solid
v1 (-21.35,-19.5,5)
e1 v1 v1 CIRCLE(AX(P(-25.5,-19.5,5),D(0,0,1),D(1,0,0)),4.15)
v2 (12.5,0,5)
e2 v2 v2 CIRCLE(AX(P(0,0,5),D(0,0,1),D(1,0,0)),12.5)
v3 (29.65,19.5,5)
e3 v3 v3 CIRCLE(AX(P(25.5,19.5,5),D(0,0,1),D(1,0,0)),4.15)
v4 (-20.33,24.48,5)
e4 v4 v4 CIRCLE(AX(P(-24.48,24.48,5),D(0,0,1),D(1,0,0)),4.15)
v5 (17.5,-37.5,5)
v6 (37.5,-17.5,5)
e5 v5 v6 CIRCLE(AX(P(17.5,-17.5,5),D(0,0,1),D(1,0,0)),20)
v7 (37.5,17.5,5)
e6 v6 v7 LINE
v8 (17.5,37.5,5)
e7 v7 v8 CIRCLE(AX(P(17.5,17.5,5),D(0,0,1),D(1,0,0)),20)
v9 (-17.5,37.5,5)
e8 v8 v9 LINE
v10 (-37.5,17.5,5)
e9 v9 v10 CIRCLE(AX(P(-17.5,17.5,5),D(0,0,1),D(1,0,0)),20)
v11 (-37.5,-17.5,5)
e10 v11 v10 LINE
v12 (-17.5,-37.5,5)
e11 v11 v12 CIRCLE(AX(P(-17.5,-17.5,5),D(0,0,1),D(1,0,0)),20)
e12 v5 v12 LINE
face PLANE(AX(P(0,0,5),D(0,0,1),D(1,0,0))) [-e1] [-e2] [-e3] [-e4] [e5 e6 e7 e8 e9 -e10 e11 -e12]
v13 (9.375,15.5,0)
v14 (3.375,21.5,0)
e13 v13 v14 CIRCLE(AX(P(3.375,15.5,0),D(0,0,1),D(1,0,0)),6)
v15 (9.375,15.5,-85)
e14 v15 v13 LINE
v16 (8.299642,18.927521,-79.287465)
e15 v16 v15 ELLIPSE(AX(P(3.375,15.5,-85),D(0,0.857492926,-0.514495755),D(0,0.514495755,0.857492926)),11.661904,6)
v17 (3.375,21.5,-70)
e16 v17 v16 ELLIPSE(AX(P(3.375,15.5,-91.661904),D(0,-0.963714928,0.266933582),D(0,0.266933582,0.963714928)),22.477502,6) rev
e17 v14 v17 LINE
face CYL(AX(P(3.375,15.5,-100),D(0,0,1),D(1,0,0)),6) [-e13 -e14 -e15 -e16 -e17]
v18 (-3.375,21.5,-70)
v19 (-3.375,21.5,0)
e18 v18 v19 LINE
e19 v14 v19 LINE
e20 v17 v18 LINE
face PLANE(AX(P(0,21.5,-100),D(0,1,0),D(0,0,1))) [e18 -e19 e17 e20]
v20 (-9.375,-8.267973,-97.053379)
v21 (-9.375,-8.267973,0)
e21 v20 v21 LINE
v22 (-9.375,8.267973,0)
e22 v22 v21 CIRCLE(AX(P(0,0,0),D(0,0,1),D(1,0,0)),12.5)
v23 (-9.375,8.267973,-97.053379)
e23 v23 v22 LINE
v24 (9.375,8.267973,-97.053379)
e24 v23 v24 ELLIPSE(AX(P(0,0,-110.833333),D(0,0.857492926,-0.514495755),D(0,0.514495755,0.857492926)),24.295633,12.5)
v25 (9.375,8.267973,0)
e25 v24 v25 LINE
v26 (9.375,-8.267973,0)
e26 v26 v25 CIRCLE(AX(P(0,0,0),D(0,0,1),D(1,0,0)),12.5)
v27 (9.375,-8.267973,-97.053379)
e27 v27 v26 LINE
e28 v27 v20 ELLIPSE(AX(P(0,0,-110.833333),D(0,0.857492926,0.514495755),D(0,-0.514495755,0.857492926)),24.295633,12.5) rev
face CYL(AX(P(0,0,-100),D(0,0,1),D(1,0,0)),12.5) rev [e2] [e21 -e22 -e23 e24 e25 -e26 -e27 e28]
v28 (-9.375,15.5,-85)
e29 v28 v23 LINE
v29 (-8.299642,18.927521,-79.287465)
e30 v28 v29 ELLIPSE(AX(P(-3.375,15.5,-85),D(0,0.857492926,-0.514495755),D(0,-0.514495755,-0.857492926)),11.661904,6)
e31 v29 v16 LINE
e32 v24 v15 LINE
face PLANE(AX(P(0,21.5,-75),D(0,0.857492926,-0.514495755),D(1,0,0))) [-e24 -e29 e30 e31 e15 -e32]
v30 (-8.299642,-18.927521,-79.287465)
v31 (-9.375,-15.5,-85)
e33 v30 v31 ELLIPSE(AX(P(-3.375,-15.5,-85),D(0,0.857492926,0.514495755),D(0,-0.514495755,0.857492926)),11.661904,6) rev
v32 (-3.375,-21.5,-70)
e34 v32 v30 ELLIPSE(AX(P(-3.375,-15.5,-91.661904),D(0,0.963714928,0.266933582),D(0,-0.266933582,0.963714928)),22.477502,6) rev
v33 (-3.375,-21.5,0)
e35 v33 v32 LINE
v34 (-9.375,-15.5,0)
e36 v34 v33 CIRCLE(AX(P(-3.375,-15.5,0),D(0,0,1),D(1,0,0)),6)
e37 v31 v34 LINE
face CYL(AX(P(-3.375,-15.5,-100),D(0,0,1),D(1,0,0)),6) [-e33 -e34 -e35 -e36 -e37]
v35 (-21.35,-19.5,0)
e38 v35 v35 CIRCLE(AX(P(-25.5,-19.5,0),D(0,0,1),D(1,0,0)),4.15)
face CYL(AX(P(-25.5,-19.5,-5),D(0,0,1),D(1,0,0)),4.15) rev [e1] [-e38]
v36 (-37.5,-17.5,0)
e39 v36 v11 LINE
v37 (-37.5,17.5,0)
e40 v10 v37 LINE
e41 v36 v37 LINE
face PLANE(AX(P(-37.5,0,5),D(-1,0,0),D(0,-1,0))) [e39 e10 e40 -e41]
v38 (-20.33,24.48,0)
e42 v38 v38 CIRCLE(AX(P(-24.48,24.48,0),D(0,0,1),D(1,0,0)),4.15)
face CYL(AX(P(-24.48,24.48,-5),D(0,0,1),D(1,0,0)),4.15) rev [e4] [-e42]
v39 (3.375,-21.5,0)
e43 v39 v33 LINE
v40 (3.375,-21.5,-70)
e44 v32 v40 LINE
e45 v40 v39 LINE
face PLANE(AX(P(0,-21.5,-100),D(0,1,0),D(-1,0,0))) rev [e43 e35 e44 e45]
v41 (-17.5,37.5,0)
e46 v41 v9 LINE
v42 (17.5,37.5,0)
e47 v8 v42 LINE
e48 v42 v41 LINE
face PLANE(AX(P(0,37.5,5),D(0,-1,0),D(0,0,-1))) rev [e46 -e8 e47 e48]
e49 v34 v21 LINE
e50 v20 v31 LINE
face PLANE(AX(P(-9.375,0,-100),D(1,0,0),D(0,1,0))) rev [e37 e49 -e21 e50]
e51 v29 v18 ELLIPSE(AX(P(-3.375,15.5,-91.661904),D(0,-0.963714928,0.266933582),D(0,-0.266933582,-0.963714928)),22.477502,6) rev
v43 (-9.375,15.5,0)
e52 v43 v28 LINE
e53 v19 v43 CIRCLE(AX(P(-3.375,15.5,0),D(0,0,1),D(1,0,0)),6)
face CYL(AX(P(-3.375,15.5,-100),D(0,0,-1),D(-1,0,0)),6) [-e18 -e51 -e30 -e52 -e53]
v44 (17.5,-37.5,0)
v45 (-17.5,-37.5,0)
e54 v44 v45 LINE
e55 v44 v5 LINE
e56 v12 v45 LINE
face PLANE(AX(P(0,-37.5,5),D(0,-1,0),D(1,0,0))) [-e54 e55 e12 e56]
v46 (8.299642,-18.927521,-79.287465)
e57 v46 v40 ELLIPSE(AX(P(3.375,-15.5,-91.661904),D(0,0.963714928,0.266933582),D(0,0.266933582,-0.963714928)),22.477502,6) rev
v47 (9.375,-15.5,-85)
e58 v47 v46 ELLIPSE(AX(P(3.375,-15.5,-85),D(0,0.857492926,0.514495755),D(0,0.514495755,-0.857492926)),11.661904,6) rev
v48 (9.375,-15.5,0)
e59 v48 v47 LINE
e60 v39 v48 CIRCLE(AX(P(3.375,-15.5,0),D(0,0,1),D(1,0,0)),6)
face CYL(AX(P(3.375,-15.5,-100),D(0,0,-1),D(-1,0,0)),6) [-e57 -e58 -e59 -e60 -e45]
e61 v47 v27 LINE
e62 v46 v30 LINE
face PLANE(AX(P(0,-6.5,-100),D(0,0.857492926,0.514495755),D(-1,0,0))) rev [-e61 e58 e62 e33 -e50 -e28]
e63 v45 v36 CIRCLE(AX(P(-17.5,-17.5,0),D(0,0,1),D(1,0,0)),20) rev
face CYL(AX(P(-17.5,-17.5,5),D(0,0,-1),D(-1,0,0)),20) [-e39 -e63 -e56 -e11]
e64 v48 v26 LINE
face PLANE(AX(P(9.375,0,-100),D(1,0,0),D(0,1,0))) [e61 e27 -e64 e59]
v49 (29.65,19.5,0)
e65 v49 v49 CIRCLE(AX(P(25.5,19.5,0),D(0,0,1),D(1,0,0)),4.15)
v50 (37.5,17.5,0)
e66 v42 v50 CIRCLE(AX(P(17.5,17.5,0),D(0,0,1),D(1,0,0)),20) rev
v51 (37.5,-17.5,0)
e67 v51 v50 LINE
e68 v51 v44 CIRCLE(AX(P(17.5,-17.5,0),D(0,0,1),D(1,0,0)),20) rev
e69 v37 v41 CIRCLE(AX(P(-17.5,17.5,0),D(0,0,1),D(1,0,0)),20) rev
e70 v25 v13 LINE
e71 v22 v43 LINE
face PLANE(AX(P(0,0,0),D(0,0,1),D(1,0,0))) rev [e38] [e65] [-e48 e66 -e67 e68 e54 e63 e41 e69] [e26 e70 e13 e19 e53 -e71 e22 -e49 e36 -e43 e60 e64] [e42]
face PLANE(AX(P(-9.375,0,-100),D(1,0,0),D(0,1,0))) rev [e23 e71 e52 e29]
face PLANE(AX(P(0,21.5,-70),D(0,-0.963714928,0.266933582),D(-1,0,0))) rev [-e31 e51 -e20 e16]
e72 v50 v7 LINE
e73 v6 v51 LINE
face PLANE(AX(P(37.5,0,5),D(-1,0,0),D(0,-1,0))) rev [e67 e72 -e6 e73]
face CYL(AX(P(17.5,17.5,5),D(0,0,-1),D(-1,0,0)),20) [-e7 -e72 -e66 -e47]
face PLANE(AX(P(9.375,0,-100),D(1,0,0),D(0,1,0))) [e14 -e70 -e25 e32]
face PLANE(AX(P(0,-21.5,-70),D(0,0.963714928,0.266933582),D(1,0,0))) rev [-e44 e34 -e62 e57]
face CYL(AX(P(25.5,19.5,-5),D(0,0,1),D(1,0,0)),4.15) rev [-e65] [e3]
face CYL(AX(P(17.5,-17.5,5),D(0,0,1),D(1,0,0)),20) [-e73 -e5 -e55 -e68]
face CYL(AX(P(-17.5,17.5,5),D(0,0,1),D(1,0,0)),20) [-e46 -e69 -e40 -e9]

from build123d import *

# Parameters (mm, degrees)
CROQUIS2_W              = 75
CROQUIS2_H              = 75
SALIENTE_EXTRUIR1_DEPTH = 5
SALIENTE_EXTRUIR2_DEPTH = 100
CHAFL_N1_SIZE           = 25
CHAFL_N1_SIZE_2         = 15
CHAFL_N2_SIZE           = 25
CHAFL_N2_SIZE_2         = 15
CORTAR_EXTRUIR1_REACH   = 112.598
CHAFL_N3_SIZE           = 5
REDONDEO1_R             = 6
REDONDEO2_R             = 20
SKETCH1_R               = 4.15
CUT_EXTRUDE2_DEPTH      = 10


with BuildPart() as part:
    # Croquis2 → Saliente-Extruir1 (new body)
    with BuildSketch(Plane(origin=(0, 0, 0), x_dir=(0, 1, 0), z_dir=(0, 0, 1))):
        Rectangle(CROQUIS2_W, CROQUIS2_H)
    extrude(amount=SALIENTE_EXTRUIR1_DEPTH)

    # Croquis2<3> → Saliente-Extruir2 (add)
    with BuildSketch(Plane(origin=(0, 0, 0), x_dir=(0, 1, 0), z_dir=(0, 0, 1))):
        with BuildLine():
            Line((-21.5, 9.375), (-21.5, -9.375))
            Line((-21.5, -9.375), (-8.267972847, -9.375))
            ThreePointArc((-8.267972847, -9.375), (-12.5, 0), (-8.267972847, 9.375))
            Line((-8.267972847, 9.375), (-21.5, 9.375))
        make_face()
        with BuildLine():
            ThreePointArc((8.267972847, 9.375), (12.5, 0), (8.267972847, -9.375))
            Line((8.267972847, -9.375), (21.5, -9.375))
            Line((21.5, -9.375), (21.5, 9.375))
            Line((21.5, 9.375), (8.267972847, 9.375))
        make_face()
    extrude(amount=-SALIENTE_EXTRUIR2_DEPTH)

    # Chaflán1
    # the kernel refuses this chamfer: 25, 15 mm, written as the material it takes off along each edge
    with BuildSketch(Plane(origin=(74.03152743, 21.5, -100), x_dir=(0, 0.01989341895858247, 0.9998021063601227), z_dir=(-1, 0, 0))) as chafl_n1_piece_1:
        Polygon((CHAFL_N1_SIZE * 0.99980210636, -CHAFL_N1_SIZE * 0.0198934189586), (-CHAFL_N1_SIZE_2 * 0.0198934189586, -CHAFL_N1_SIZE_2 * 0.99980210636), (0, 0), align=None)
    extrude(amount=148.06305486, mode=Mode.SUBTRACT)

    # Chaflán2
    # the kernel refuses this chamfer: 25, 15 mm, written as the material it takes off along each edge
    with BuildSketch(Plane(origin=(-74.03152743, -21.5, -100), x_dir=(0, -0.01989341895858247, 0.9998021063601227), z_dir=(1, 0, 0))) as chafl_n2_piece_1:
        Polygon((CHAFL_N2_SIZE * 0.99980210636, -CHAFL_N2_SIZE * 0.0198934189586), (-CHAFL_N2_SIZE_2 * 0.0198934189586, -CHAFL_N2_SIZE_2 * 0.99980210636), (0, 0), align=None)
    extrude(amount=148.06305486, mode=Mode.SUBTRACT)

    # Croquis2<4> → Cortar-Extruir1 (cut, up to next)
    with BuildSketch(Plane(origin=(0, 0, 0), x_dir=(0, 1, 0), z_dir=(0, 0, 1)), mode=Mode.PRIVATE) as cortar_extruir1_sk1:
        with BuildLine():
            ThreePointArc((-8.267972847, 9.375), (-12.5, 0), (-8.267972847, -9.375))
            Line((-8.267972847, -9.375), (8.267972847, -9.375))
            ThreePointArc((8.267972847, -9.375), (11.392972847, -5.142972847), (12.5, 0))
            ThreePointArc((12.5, 0), (11.392972847, 5.142972847), (8.267972847, 9.375))
            Line((8.267972847, 9.375), (-8.267972847, 9.375))
        make_face()
    cortar_extruir1_tool1 = extrude(cortar_extruir1_sk1.sketch, amount=CORTAR_EXTRUIR1_REACH, mode=Mode.PRIVATE) & part.part
    # Croquis2<4> → Cortar-Extruir1 (cut, up to next)
    with BuildSketch(Plane(origin=(0, 0, 0), x_dir=(0, 1, 0), z_dir=(0, 0, 1)), mode=Mode.PRIVATE) as cortar_extruir1_sk2:
        with BuildLine():
            Line((8.267972847, -9.375), (-8.267972847, -9.375))
            ThreePointArc((-8.267972847, -9.375), (0, -12.5), (8.267972847, -9.375))
        make_face()
    cortar_extruir1_tool2 = extrude(cortar_extruir1_sk2.sketch, amount=CORTAR_EXTRUIR1_REACH, mode=Mode.PRIVATE) & part.part
    # Croquis2<4> → Cortar-Extruir1 (cut, up to next)
    with BuildSketch(Plane(origin=(0, 0, 0), x_dir=(0, 1, 0), z_dir=(0, 0, 1)), mode=Mode.PRIVATE) as cortar_extruir1_sk3:
        with BuildLine():
            ThreePointArc((8.267972847, 9.375), (0, 12.5), (-8.267972847, 9.375))
            Line((-8.267972847, 9.375), (8.267972847, 9.375))
        make_face()
    cortar_extruir1_tool3 = extrude(cortar_extruir1_sk3.sketch, amount=CORTAR_EXTRUIR1_REACH, mode=Mode.PRIVATE) & part.part
    add(cortar_extruir1_tool1.solids().sort_by_distance((0, 0, 0))[0], mode=Mode.SUBTRACT)
    add(cortar_extruir1_tool2.solids().sort_by_distance((10.639442, 0, 0))[0], mode=Mode.SUBTRACT)
    add(cortar_extruir1_tool3.solids().sort_by_distance((-10.639442, 0, 0))[0], mode=Mode.SUBTRACT)

    # Chaflán3
    chafl_n3_edges = [part.edges().sort_by_distance(p)[0] for p in [
        (0, 21.5, -75),
        (0, -21.5, -75),
    ]]
    chamfer(chafl_n3_edges, length=CHAFL_N3_SIZE)

    # Redondeo1
    redondeo1_edges = [part.edges().sort_by_distance(p)[0] for p in [
        (-9.375, -21.5, -35),
        (9.375, -21.5, -35),
        (9.375, 21.5, -35),
        (-9.375, 21.5, -35),
    ]]
    fillet(redondeo1_edges, radius=REDONDEO1_R)

    # Redondeo2
    redondeo2_edges = [part.edges().sort_by_distance(p)[0] for p in [
        (37.5, 37.5, 2.5),
        (37.5, -37.5, 2.5),
        (-37.5, -37.5, 2.5),
        (-37.5, 37.5, 2.5),
    ]]
    fillet(redondeo2_edges, radius=REDONDEO2_R)

    # Sketch1 → Cut-Extrude2 (cut)
    with BuildSketch(Plane.XY.offset(5)):
        with Locations((25.5, 19.5)):
            Circle(SKETCH1_R)
        with Locations((-24.48, 24.48)):
            Circle(SKETCH1_R)
        with Locations((-25.5, -19.5)):
            Circle(SKETCH1_R)
    extrude(amount=-CUT_EXTRUDE2_DEPTH, mode=Mode.SUBTRACT)


solid = part.part
